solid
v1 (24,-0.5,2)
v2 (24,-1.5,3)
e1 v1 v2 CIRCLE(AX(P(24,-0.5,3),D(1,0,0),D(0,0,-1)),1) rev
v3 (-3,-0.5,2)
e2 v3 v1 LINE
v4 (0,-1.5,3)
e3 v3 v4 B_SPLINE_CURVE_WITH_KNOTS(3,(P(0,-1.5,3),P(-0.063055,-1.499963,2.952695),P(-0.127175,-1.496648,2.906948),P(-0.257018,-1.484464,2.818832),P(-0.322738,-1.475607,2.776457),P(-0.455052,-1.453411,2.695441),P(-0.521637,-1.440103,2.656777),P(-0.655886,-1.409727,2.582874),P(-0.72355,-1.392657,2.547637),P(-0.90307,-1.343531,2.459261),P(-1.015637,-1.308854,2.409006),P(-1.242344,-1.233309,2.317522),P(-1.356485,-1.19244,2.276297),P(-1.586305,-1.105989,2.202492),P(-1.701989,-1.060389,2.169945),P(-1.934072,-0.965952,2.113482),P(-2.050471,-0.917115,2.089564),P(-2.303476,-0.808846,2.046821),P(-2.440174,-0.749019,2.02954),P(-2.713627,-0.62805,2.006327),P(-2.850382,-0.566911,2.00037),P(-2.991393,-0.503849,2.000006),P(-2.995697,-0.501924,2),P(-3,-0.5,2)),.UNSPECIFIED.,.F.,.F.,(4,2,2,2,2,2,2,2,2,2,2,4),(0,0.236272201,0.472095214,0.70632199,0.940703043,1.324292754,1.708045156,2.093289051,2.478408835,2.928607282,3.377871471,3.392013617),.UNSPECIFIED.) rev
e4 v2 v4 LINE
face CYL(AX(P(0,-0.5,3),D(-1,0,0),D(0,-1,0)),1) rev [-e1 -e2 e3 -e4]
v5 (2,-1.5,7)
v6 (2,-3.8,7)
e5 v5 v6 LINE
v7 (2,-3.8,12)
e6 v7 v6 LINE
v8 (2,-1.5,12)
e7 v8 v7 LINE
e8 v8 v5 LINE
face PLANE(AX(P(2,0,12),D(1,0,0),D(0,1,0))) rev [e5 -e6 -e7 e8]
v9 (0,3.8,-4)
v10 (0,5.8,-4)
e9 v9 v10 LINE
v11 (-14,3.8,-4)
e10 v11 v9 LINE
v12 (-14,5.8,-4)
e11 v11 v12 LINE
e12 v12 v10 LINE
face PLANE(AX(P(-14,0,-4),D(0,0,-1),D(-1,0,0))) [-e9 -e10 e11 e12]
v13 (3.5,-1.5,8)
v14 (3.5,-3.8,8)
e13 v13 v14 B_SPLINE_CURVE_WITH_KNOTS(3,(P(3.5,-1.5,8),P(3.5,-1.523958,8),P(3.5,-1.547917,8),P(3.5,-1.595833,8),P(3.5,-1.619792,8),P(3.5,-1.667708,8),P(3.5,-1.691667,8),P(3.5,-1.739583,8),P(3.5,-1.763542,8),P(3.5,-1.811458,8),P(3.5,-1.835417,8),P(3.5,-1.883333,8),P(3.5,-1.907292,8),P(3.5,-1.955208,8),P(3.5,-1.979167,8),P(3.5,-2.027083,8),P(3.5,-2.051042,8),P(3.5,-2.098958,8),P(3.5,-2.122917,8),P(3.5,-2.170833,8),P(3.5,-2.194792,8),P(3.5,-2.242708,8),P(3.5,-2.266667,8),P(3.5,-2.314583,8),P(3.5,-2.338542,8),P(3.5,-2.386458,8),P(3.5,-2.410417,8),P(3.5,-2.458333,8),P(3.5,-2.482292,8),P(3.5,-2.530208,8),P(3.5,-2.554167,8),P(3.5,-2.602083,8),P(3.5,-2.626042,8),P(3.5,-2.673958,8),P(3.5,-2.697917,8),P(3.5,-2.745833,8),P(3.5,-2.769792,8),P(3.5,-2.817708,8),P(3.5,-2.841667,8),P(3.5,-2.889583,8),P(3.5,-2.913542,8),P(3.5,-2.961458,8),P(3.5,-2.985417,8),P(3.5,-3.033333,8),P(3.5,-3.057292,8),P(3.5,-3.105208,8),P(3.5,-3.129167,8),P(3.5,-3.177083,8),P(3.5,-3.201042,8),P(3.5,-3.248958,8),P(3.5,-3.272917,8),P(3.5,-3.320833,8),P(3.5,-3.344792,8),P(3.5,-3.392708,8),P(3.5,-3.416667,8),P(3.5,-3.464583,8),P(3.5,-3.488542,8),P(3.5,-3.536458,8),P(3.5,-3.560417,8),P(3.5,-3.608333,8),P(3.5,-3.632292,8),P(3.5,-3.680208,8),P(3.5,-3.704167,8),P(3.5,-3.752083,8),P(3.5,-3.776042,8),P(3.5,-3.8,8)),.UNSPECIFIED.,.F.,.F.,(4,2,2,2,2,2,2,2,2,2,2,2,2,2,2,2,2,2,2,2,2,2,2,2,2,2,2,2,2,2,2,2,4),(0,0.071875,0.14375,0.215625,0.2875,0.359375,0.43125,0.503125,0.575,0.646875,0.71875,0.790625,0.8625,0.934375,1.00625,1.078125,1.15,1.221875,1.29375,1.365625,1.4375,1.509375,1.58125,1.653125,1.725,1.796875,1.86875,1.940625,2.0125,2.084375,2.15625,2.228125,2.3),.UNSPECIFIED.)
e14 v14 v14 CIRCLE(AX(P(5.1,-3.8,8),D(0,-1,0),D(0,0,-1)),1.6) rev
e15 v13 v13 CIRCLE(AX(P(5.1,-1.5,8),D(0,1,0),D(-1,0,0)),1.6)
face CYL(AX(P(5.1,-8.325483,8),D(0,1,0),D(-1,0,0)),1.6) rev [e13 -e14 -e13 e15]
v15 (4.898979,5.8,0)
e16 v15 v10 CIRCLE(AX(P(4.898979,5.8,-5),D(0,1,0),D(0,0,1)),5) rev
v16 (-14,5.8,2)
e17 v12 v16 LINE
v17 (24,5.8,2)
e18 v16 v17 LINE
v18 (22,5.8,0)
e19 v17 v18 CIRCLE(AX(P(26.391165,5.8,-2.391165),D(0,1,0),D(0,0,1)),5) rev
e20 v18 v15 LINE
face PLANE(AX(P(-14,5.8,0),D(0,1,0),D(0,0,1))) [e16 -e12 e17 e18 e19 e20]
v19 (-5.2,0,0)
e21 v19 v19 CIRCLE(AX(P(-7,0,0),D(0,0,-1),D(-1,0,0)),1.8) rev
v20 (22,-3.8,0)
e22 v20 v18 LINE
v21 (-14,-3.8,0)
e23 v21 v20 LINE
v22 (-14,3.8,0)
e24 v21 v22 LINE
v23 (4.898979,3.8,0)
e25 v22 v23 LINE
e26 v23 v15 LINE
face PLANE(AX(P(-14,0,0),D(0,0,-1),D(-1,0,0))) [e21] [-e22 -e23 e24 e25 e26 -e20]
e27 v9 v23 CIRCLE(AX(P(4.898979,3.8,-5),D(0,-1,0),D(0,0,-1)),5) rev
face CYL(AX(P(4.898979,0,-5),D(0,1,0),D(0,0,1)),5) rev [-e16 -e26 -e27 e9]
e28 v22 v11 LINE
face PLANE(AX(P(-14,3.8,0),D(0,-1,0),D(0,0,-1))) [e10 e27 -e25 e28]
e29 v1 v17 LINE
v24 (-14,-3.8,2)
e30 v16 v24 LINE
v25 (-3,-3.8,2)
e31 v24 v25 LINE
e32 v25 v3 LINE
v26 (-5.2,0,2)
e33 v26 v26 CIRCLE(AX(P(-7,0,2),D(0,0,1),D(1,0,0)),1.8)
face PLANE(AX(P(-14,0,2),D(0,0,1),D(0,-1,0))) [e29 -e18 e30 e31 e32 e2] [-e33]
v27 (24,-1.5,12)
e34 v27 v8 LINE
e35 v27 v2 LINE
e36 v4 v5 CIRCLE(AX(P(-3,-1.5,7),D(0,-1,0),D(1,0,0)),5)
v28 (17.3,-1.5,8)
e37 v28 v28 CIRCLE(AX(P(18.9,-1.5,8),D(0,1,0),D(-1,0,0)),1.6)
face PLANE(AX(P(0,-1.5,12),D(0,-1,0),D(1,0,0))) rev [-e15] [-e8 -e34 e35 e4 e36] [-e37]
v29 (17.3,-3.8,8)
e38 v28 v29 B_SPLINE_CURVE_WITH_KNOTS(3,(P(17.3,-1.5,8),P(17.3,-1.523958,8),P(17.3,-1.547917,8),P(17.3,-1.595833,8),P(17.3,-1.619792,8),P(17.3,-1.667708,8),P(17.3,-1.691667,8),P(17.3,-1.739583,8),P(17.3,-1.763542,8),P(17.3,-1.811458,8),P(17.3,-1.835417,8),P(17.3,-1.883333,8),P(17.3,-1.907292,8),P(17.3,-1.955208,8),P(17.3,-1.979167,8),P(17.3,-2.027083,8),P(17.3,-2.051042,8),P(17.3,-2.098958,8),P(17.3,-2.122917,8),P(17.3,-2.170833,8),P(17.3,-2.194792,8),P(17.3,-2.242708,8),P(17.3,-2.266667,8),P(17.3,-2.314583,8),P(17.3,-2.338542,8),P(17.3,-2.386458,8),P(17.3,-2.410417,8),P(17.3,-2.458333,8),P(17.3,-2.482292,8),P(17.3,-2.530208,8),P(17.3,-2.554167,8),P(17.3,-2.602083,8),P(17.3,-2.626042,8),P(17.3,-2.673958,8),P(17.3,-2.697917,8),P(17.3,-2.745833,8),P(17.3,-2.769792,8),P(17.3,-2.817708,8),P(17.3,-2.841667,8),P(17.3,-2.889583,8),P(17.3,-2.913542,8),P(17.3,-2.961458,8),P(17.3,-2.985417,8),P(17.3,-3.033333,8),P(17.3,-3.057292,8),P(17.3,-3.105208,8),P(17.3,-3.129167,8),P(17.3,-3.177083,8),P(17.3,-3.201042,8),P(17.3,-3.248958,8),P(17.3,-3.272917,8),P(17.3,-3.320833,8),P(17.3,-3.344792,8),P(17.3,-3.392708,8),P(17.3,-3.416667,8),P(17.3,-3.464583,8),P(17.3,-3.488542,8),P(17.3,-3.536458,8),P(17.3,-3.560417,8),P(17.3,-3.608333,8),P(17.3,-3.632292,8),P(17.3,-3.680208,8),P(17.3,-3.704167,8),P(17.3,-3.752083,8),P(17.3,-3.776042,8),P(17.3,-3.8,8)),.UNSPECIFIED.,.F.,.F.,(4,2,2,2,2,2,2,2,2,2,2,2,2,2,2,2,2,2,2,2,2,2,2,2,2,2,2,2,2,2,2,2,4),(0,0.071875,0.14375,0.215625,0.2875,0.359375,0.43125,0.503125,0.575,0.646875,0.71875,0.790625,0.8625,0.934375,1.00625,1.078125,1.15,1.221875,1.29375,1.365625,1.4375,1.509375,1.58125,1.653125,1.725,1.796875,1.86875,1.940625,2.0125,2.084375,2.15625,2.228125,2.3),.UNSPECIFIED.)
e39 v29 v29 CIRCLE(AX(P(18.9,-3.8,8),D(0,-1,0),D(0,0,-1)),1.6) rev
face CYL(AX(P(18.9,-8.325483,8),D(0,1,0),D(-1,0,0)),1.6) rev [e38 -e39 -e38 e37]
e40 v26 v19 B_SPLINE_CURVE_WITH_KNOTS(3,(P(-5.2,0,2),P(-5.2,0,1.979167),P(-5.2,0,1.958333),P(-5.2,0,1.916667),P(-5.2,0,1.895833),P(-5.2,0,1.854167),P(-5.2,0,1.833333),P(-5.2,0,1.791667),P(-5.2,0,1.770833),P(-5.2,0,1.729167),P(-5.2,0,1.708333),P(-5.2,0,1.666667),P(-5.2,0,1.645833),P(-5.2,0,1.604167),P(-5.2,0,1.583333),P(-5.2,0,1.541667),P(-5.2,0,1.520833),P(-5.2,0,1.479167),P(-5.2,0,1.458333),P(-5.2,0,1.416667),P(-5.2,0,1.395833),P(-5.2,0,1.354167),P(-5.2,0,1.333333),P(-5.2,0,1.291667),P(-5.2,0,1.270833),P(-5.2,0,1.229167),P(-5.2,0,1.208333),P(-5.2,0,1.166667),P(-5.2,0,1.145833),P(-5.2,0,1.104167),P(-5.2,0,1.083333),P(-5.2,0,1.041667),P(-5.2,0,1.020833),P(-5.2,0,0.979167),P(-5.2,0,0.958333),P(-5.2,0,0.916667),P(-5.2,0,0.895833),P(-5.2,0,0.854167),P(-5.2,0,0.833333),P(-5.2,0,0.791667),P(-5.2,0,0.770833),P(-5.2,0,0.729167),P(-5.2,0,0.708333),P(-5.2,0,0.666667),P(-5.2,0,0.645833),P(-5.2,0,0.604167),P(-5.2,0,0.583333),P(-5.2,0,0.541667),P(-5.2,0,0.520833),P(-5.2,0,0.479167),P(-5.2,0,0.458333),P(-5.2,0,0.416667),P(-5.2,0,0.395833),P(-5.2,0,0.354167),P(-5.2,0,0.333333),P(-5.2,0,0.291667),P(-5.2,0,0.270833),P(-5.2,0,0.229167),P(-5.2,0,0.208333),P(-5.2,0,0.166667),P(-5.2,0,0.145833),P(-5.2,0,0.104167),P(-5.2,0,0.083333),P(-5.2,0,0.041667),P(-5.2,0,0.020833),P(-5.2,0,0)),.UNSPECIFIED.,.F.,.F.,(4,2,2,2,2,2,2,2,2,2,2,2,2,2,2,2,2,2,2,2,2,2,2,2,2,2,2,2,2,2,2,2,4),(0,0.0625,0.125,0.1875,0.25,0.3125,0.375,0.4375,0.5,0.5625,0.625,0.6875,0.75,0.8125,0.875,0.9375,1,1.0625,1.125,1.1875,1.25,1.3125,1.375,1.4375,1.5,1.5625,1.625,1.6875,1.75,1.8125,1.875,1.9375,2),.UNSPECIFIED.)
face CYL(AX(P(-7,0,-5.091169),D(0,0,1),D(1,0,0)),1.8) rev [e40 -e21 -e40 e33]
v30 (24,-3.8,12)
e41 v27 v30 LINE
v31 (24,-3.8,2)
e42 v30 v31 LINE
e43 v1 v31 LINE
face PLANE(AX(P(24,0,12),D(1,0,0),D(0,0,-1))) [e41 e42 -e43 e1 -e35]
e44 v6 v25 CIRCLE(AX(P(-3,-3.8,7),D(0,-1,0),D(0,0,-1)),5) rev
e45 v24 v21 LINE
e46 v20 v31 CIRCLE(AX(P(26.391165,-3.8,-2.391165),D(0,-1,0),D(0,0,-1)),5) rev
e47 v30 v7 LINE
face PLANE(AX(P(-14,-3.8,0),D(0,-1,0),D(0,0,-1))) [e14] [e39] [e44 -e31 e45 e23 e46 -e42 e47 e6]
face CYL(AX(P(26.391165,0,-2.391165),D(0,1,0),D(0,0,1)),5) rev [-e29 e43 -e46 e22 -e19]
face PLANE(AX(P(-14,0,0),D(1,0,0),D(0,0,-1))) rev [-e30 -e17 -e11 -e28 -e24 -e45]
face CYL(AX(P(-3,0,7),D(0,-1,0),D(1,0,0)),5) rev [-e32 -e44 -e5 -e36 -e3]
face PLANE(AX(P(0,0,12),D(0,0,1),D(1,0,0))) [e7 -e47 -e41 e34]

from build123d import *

# Parameters (mm, degrees)
CROQUIS1_W              = 2
CROQUIS1_H              = 2
CROQUIS1_W_2            = 4
SALIENTE_EXTRUIR1_DEPTH = 14
CROQUIS1_3_W            = 2
CROQUIS1_3_H            = 2
SALIENTE_EXTRUIR2_DEPTH = 22
CORTAR_EXTRUIR1_DEPTH   = 2
CROQUIS2_3_W            = 18
CROQUIS2_3_H            = 2.3
CROQUIS2_3_W_2          = 2
SALIENTE_EXTRUIR3_DEPTH = 10
CROQUIS3_R              = 1.6
CORTAR_EXTRUIR2_DEPTH   = 2.3
REDONDEO1_R             = 5
REDONDEO4_START         = -3.8
REDONDEO4_DEPTH         = 9.6
REDONDEO5_R             = 1
REDONDEO6_R             = 5


with BuildPart() as part:
    # Croquis1 → Saliente-Extruir1 (new body)
    with BuildSketch(Plane(origin=(0, 0, 0), x_dir=(0, 0, -1), z_dir=(1, 0, 0))):
        Polygon((0, -3.8), (0, 0), (0, 3.8), (-2, 3.8), (-2, -3.8), align=None)
        with Locations((-1, 4.8)):
            Rectangle(CROQUIS1_W, CROQUIS1_H)
        with Locations((2, 4.8)):
            Rectangle(CROQUIS1_W_2, CROQUIS1_H)
    extrude(amount=-SALIENTE_EXTRUIR1_DEPTH)

    # Croquis1<3> → Saliente-Extruir2 (add)
    with BuildSketch(Plane(origin=(0, 0, 0), x_dir=(0, 0, -1), z_dir=(1, 0, 0))):
        Polygon((0, -3.8), (0, 0), (0, 3.8), (-2, 3.8), (-2, -3.8), align=None)
        with Locations((-1, 4.8)):
            Rectangle(CROQUIS1_3_W, CROQUIS1_3_H)
    extrude(amount=SALIENTE_EXTRUIR2_DEPTH)

    # Croquis2 → Cortar-Extruir1 (cut)
    with BuildSketch(Plane.XY.offset(2)):
        with BuildLine():
            ThreePointArc((-8.8, 0), (-7, -1.8), (-5.2, 0))
            Line((-5.2, 0), (-8.8, 0))
        make_face()
        with BuildLine():
            Line((-8.8, 0), (-5.2, 0))
            ThreePointArc((-5.2, 0), (-7, 1.8), (-8.8, 0))
        make_face()
    extrude(amount=-CORTAR_EXTRUIR1_DEPTH, mode=Mode.SUBTRACT)

    # Croquis2<3> → Saliente-Extruir3 (add)
    with BuildSketch(Plane.XY.offset(2)):
        with Locations((13, -2.65)):
            Rectangle(CROQUIS2_3_W, CROQUIS2_3_H)
        with Locations((3, -2.65)):
            Rectangle(CROQUIS2_3_W_2, CROQUIS2_3_H)
        with Locations((23, -2.65)):
            Rectangle(CROQUIS2_3_W_2, CROQUIS2_3_H)
    extrude(amount=SALIENTE_EXTRUIR3_DEPTH)

    # Croquis3 → Cortar-Extruir2 (cut)
    with BuildSketch(Plane(origin=(0, -1.5, 0), x_dir=(1, 0, 0), z_dir=(0, 1, 0))):
        with Locations(Location((5.1, -8, 0), (0, 0, 180))):
            Circle(CROQUIS3_R)
        with Locations(Location((18.9, -8, 0), (0, 0, 180))):
            Circle(CROQUIS3_R)
    extrude(amount=-CORTAR_EXTRUIR2_DEPTH, mode=Mode.SUBTRACT)

    # Redondeo1
    # the kernel refuses this fillet: 5 mm, written as the material it adds along each edge
    with BuildSketch(Plane(origin=(0, 3.8, 0), x_dir=(1, 0, 0), z_dir=(0, 1, 0))) as redondeo1_piece_1:
        with BuildLine():
            CenterArc((4.898979486, 5), REDONDEO1_R, 191.536959033, 78.463040967)
            Line((0, 4), (-0.09797959, 3.98))
            ThreePointArc((-0.09797959, 3.98), (-0.1, 2), (-0.1, 0))
            Line((-0.1, 0), (0, -0.1))
            Line((0, -0.1), (4.898979486, -0.1))
            Line((4.898979486, -0.1), (4.898979486, 0))
        make_face()
    extrude(amount=2)

    # Redondeo4: read off the stored shape, not the designer's step
    # Redondeo4 outline → Redondeo4 (add)
    with BuildSketch(Plane(origin=(0, 0, 0), x_dir=(1, 0, 0), z_dir=(0, 1, 0)).offset(REDONDEO4_START)):
        with BuildLine():
            ThreePointArc((24, -2), (22.855631086, -1.144368914), (22, 0))
            Line((22, 0), (22, -2))
            Line((22, -2), (24, -2))
        make_face()
    extrude(amount=REDONDEO4_DEPTH)

    # Redondeo5
    redondeo5_edges = [part.edges().sort_by_distance(p)[0] for p in [
        (13, -1.5, 2),
    ]]
    fillet(redondeo5_edges, radius=REDONDEO5_R)

    # Redondeo6
    redondeo6_edges = [part.edges().sort_by_distance(p)[0] for p in [
        (2, -2.15, 2),
    ]]
    fillet(redondeo6_edges, radius=REDONDEO6_R)


solid = part.part
